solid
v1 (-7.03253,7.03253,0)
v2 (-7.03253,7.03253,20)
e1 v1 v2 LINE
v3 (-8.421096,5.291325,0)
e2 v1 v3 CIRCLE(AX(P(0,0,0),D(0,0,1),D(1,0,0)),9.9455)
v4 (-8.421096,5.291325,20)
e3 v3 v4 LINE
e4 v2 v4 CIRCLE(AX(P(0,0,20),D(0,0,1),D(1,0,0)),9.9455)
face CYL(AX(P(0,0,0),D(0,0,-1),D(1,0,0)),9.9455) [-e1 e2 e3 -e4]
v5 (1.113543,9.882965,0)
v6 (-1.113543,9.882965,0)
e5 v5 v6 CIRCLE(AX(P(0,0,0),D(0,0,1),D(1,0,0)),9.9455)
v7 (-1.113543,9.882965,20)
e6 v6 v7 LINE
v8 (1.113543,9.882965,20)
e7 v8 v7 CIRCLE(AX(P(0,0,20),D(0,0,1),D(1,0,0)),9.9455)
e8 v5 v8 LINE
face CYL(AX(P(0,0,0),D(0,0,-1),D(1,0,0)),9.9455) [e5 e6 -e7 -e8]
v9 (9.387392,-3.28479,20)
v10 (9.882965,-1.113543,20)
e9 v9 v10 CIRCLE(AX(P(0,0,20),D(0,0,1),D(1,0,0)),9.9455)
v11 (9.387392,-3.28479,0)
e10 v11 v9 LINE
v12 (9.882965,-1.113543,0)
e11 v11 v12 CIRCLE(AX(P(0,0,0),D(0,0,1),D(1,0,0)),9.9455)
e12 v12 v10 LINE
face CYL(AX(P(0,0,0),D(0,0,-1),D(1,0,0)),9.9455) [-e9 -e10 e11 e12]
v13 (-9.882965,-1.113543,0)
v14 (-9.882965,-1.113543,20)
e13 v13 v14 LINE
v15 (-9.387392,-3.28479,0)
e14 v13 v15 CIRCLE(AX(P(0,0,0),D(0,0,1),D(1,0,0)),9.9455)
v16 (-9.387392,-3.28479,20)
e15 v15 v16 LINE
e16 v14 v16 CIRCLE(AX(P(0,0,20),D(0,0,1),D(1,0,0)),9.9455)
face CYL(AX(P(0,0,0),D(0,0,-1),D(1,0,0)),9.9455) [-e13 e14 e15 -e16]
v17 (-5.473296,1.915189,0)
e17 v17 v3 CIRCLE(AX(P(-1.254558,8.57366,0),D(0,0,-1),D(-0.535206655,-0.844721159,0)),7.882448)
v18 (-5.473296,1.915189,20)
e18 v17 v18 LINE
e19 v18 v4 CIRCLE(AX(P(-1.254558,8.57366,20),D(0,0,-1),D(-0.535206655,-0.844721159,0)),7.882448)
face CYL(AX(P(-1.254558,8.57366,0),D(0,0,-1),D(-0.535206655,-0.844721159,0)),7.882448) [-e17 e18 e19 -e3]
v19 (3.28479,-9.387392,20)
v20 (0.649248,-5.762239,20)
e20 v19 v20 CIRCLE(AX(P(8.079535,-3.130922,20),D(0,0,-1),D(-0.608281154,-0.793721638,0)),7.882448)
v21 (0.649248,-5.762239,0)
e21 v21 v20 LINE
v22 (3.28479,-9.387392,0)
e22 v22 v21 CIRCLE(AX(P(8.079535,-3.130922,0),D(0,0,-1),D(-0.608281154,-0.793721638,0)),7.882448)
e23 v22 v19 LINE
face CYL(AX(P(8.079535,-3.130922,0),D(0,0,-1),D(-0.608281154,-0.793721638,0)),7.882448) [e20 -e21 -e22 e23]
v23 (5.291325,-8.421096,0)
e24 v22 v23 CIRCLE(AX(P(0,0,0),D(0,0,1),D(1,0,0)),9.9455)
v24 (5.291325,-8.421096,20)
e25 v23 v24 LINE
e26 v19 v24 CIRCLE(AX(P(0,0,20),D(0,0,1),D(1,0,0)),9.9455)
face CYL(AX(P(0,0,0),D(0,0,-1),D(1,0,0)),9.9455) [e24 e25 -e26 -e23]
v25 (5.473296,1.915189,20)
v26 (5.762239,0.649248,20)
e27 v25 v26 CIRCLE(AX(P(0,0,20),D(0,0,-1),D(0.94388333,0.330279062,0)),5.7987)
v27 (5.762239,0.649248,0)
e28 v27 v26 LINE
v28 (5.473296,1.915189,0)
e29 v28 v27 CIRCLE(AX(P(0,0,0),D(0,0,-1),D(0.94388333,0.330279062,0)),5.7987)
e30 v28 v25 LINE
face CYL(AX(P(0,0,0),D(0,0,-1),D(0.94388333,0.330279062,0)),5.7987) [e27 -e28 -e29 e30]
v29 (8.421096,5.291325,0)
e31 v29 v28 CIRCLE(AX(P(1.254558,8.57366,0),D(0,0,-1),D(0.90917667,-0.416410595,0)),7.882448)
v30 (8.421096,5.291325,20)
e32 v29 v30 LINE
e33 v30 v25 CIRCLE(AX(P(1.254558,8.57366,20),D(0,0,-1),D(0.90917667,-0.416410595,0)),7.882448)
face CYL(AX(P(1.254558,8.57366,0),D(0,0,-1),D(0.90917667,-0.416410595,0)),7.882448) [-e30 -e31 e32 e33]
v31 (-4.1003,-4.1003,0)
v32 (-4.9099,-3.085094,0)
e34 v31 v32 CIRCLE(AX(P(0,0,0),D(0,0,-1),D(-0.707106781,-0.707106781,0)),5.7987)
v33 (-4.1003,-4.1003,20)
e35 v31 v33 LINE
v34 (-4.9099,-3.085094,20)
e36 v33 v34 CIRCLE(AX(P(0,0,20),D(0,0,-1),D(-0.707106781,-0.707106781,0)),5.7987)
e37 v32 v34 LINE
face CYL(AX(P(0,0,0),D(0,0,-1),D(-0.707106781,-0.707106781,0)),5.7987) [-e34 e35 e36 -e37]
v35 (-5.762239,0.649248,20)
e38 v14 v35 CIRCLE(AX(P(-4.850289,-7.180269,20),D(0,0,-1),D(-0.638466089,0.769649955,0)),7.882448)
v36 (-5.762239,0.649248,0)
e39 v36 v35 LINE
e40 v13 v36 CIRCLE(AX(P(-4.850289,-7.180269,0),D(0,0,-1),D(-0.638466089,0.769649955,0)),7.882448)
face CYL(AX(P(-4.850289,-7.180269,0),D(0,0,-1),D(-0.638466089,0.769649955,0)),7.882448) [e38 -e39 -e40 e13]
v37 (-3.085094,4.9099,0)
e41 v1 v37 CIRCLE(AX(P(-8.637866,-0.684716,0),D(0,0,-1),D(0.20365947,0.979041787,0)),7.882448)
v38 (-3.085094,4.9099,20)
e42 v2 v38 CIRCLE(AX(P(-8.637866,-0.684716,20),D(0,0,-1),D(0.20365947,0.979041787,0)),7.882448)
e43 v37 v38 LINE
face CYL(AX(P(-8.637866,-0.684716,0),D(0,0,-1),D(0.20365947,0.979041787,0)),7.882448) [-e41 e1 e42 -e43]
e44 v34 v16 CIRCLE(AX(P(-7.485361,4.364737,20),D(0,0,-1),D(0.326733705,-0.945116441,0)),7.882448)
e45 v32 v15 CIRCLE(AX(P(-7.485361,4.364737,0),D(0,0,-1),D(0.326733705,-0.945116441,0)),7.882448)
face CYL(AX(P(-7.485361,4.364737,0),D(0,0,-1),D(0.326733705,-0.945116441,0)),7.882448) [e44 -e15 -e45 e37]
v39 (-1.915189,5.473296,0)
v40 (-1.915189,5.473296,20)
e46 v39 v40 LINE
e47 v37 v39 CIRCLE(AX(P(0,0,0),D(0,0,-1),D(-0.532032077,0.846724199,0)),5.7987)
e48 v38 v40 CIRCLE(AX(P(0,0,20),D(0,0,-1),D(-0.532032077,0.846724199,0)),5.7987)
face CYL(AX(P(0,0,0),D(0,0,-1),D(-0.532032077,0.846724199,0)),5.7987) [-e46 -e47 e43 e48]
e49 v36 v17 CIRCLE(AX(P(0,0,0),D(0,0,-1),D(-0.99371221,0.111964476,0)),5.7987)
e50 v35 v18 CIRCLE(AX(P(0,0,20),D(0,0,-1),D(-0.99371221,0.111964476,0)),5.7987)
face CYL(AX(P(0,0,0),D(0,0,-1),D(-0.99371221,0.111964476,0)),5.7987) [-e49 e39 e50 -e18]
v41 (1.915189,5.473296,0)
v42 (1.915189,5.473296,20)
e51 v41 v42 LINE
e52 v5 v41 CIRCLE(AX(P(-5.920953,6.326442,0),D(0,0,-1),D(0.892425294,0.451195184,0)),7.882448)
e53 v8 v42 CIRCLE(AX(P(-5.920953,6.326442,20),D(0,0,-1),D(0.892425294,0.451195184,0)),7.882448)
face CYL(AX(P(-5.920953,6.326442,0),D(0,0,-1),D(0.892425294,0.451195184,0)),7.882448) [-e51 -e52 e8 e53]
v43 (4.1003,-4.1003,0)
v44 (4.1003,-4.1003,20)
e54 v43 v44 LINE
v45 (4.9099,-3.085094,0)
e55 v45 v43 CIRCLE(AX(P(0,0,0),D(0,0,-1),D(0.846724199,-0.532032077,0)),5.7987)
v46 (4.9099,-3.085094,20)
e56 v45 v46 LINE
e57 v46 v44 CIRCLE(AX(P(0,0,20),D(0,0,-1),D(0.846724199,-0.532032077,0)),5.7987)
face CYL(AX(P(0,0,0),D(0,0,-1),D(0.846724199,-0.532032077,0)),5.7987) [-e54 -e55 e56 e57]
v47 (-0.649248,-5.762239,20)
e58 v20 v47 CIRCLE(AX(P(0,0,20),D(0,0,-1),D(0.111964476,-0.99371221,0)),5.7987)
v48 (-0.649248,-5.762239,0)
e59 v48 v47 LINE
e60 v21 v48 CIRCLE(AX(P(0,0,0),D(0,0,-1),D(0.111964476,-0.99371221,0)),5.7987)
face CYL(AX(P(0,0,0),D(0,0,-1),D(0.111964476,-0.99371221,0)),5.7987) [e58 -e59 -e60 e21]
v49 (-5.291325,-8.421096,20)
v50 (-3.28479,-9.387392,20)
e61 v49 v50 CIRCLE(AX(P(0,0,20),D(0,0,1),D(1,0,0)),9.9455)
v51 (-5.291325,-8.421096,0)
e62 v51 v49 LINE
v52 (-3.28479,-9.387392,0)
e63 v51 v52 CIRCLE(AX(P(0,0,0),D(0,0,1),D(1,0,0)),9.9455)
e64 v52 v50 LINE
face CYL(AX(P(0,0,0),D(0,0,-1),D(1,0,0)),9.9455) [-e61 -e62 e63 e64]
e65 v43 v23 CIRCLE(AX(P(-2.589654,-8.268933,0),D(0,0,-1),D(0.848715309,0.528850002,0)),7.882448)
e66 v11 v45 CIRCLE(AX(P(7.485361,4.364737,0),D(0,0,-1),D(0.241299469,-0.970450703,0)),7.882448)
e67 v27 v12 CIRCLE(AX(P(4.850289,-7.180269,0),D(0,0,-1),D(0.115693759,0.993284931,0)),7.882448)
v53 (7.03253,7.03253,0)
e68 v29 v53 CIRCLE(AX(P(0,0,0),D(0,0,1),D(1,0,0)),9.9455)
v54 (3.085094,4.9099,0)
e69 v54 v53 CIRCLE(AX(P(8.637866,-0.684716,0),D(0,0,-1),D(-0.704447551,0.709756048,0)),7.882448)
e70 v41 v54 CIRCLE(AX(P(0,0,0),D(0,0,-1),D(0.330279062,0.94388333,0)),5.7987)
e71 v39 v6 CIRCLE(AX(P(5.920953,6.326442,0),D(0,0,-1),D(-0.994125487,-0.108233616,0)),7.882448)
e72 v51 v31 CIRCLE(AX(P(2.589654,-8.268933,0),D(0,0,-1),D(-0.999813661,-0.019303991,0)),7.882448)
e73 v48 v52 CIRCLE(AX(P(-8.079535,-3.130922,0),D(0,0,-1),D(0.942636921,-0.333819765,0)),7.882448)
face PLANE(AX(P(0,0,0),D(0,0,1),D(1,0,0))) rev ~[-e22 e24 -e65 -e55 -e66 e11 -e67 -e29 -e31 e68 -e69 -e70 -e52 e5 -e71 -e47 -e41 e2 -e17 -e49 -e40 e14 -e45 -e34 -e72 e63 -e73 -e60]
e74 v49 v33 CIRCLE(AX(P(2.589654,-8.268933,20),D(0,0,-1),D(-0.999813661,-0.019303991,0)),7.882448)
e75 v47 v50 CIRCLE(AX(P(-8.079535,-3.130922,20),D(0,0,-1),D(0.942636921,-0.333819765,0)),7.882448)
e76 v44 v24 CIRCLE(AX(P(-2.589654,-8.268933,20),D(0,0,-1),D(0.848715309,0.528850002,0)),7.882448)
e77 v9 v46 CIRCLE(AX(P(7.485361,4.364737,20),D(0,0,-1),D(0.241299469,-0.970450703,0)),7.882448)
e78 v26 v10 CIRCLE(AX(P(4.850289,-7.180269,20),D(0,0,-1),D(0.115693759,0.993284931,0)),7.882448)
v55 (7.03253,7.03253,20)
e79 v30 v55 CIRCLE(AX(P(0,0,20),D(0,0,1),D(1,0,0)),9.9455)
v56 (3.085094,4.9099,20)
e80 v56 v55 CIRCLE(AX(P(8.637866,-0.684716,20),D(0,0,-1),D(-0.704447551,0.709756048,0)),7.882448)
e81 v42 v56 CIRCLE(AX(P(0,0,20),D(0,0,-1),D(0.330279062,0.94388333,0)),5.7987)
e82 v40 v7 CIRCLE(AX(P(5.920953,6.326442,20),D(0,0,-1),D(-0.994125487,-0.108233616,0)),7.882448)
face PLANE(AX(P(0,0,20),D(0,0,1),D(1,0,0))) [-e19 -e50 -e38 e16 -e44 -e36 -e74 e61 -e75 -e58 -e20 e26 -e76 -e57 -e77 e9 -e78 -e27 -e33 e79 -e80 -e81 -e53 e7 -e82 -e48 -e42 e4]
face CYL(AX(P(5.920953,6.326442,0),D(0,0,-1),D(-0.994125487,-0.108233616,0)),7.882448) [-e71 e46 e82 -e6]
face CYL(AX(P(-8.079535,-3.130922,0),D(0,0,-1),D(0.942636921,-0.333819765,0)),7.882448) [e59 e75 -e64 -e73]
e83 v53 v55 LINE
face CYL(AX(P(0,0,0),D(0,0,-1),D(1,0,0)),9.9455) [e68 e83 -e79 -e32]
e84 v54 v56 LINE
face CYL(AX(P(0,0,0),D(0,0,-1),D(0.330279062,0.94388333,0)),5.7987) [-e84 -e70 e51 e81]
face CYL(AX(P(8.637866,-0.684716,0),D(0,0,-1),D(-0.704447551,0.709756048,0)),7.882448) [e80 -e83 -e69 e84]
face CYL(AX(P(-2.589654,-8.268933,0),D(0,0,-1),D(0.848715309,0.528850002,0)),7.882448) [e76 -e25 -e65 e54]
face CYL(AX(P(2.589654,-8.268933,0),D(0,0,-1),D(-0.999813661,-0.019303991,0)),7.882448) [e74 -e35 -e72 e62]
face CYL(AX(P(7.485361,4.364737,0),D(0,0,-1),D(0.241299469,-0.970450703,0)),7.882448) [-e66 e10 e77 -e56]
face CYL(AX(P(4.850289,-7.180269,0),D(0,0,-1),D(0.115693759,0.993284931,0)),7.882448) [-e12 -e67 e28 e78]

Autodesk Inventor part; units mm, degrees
sketch "Sketch1" plane through (0, 0, 0) normal (0, 0, 1) x (1, 0, 0)
  circle A0 centre (0, 0) radius 9.9455
  dimension "d0" = 19.891
extrude "Extrusion1" add sketch "Sketch1" along normal blind 20
ref_plane "Work Plane2" through (0, 0, 10) normal (0, 0, 1) x (1, 0, 0)
sketch "Sketch2" plane through (0, 0, 0) normal (0, 0, -1) x (-1, 0, 0)
  circle A0 centre (0, 0) radius 9.9455 projected
  circle A1 centre (0, 0) radius 7.147
  dimension "d3" = 14.2941
surface extrude "Pitch Diameter" sketch "Sketch2" against normal through all shown no curves A1
ref_plane "Work Plane8" through (0, 0, 0) normal (0.9009689, 0.4338837, 0) x (0, 0, 1)
ref_plane "Work Plane9" through (0, 0, 0) normal (1, 0, 0) x (0, 1, 0)
spur gear teeth "Spur Gear" teeth 7 pitch diameter 14 tip diameter 19.891 root diameter 11.5974 face width 20 start plane through (0, 0, 0) normal (0, 0, -1) x (-1, 0, 0)
equation "\"d0\" = da_da"
equation "\"d1\" = da_b"
equation "\"d3\" = da_dw"
equation "\"d16\" = da_aw"
equation "\"d43\" = da_aw"
equation "\"d46\" = da_aw"
equation "\"da_da\" = 19.891016"
equation "\"da_b\" = 20"
equation "\"da_dw\" = 14.294055"
equation "\"da_aw\" = 35.735137"
properties part number "Spur Gear1" material "Steel"
